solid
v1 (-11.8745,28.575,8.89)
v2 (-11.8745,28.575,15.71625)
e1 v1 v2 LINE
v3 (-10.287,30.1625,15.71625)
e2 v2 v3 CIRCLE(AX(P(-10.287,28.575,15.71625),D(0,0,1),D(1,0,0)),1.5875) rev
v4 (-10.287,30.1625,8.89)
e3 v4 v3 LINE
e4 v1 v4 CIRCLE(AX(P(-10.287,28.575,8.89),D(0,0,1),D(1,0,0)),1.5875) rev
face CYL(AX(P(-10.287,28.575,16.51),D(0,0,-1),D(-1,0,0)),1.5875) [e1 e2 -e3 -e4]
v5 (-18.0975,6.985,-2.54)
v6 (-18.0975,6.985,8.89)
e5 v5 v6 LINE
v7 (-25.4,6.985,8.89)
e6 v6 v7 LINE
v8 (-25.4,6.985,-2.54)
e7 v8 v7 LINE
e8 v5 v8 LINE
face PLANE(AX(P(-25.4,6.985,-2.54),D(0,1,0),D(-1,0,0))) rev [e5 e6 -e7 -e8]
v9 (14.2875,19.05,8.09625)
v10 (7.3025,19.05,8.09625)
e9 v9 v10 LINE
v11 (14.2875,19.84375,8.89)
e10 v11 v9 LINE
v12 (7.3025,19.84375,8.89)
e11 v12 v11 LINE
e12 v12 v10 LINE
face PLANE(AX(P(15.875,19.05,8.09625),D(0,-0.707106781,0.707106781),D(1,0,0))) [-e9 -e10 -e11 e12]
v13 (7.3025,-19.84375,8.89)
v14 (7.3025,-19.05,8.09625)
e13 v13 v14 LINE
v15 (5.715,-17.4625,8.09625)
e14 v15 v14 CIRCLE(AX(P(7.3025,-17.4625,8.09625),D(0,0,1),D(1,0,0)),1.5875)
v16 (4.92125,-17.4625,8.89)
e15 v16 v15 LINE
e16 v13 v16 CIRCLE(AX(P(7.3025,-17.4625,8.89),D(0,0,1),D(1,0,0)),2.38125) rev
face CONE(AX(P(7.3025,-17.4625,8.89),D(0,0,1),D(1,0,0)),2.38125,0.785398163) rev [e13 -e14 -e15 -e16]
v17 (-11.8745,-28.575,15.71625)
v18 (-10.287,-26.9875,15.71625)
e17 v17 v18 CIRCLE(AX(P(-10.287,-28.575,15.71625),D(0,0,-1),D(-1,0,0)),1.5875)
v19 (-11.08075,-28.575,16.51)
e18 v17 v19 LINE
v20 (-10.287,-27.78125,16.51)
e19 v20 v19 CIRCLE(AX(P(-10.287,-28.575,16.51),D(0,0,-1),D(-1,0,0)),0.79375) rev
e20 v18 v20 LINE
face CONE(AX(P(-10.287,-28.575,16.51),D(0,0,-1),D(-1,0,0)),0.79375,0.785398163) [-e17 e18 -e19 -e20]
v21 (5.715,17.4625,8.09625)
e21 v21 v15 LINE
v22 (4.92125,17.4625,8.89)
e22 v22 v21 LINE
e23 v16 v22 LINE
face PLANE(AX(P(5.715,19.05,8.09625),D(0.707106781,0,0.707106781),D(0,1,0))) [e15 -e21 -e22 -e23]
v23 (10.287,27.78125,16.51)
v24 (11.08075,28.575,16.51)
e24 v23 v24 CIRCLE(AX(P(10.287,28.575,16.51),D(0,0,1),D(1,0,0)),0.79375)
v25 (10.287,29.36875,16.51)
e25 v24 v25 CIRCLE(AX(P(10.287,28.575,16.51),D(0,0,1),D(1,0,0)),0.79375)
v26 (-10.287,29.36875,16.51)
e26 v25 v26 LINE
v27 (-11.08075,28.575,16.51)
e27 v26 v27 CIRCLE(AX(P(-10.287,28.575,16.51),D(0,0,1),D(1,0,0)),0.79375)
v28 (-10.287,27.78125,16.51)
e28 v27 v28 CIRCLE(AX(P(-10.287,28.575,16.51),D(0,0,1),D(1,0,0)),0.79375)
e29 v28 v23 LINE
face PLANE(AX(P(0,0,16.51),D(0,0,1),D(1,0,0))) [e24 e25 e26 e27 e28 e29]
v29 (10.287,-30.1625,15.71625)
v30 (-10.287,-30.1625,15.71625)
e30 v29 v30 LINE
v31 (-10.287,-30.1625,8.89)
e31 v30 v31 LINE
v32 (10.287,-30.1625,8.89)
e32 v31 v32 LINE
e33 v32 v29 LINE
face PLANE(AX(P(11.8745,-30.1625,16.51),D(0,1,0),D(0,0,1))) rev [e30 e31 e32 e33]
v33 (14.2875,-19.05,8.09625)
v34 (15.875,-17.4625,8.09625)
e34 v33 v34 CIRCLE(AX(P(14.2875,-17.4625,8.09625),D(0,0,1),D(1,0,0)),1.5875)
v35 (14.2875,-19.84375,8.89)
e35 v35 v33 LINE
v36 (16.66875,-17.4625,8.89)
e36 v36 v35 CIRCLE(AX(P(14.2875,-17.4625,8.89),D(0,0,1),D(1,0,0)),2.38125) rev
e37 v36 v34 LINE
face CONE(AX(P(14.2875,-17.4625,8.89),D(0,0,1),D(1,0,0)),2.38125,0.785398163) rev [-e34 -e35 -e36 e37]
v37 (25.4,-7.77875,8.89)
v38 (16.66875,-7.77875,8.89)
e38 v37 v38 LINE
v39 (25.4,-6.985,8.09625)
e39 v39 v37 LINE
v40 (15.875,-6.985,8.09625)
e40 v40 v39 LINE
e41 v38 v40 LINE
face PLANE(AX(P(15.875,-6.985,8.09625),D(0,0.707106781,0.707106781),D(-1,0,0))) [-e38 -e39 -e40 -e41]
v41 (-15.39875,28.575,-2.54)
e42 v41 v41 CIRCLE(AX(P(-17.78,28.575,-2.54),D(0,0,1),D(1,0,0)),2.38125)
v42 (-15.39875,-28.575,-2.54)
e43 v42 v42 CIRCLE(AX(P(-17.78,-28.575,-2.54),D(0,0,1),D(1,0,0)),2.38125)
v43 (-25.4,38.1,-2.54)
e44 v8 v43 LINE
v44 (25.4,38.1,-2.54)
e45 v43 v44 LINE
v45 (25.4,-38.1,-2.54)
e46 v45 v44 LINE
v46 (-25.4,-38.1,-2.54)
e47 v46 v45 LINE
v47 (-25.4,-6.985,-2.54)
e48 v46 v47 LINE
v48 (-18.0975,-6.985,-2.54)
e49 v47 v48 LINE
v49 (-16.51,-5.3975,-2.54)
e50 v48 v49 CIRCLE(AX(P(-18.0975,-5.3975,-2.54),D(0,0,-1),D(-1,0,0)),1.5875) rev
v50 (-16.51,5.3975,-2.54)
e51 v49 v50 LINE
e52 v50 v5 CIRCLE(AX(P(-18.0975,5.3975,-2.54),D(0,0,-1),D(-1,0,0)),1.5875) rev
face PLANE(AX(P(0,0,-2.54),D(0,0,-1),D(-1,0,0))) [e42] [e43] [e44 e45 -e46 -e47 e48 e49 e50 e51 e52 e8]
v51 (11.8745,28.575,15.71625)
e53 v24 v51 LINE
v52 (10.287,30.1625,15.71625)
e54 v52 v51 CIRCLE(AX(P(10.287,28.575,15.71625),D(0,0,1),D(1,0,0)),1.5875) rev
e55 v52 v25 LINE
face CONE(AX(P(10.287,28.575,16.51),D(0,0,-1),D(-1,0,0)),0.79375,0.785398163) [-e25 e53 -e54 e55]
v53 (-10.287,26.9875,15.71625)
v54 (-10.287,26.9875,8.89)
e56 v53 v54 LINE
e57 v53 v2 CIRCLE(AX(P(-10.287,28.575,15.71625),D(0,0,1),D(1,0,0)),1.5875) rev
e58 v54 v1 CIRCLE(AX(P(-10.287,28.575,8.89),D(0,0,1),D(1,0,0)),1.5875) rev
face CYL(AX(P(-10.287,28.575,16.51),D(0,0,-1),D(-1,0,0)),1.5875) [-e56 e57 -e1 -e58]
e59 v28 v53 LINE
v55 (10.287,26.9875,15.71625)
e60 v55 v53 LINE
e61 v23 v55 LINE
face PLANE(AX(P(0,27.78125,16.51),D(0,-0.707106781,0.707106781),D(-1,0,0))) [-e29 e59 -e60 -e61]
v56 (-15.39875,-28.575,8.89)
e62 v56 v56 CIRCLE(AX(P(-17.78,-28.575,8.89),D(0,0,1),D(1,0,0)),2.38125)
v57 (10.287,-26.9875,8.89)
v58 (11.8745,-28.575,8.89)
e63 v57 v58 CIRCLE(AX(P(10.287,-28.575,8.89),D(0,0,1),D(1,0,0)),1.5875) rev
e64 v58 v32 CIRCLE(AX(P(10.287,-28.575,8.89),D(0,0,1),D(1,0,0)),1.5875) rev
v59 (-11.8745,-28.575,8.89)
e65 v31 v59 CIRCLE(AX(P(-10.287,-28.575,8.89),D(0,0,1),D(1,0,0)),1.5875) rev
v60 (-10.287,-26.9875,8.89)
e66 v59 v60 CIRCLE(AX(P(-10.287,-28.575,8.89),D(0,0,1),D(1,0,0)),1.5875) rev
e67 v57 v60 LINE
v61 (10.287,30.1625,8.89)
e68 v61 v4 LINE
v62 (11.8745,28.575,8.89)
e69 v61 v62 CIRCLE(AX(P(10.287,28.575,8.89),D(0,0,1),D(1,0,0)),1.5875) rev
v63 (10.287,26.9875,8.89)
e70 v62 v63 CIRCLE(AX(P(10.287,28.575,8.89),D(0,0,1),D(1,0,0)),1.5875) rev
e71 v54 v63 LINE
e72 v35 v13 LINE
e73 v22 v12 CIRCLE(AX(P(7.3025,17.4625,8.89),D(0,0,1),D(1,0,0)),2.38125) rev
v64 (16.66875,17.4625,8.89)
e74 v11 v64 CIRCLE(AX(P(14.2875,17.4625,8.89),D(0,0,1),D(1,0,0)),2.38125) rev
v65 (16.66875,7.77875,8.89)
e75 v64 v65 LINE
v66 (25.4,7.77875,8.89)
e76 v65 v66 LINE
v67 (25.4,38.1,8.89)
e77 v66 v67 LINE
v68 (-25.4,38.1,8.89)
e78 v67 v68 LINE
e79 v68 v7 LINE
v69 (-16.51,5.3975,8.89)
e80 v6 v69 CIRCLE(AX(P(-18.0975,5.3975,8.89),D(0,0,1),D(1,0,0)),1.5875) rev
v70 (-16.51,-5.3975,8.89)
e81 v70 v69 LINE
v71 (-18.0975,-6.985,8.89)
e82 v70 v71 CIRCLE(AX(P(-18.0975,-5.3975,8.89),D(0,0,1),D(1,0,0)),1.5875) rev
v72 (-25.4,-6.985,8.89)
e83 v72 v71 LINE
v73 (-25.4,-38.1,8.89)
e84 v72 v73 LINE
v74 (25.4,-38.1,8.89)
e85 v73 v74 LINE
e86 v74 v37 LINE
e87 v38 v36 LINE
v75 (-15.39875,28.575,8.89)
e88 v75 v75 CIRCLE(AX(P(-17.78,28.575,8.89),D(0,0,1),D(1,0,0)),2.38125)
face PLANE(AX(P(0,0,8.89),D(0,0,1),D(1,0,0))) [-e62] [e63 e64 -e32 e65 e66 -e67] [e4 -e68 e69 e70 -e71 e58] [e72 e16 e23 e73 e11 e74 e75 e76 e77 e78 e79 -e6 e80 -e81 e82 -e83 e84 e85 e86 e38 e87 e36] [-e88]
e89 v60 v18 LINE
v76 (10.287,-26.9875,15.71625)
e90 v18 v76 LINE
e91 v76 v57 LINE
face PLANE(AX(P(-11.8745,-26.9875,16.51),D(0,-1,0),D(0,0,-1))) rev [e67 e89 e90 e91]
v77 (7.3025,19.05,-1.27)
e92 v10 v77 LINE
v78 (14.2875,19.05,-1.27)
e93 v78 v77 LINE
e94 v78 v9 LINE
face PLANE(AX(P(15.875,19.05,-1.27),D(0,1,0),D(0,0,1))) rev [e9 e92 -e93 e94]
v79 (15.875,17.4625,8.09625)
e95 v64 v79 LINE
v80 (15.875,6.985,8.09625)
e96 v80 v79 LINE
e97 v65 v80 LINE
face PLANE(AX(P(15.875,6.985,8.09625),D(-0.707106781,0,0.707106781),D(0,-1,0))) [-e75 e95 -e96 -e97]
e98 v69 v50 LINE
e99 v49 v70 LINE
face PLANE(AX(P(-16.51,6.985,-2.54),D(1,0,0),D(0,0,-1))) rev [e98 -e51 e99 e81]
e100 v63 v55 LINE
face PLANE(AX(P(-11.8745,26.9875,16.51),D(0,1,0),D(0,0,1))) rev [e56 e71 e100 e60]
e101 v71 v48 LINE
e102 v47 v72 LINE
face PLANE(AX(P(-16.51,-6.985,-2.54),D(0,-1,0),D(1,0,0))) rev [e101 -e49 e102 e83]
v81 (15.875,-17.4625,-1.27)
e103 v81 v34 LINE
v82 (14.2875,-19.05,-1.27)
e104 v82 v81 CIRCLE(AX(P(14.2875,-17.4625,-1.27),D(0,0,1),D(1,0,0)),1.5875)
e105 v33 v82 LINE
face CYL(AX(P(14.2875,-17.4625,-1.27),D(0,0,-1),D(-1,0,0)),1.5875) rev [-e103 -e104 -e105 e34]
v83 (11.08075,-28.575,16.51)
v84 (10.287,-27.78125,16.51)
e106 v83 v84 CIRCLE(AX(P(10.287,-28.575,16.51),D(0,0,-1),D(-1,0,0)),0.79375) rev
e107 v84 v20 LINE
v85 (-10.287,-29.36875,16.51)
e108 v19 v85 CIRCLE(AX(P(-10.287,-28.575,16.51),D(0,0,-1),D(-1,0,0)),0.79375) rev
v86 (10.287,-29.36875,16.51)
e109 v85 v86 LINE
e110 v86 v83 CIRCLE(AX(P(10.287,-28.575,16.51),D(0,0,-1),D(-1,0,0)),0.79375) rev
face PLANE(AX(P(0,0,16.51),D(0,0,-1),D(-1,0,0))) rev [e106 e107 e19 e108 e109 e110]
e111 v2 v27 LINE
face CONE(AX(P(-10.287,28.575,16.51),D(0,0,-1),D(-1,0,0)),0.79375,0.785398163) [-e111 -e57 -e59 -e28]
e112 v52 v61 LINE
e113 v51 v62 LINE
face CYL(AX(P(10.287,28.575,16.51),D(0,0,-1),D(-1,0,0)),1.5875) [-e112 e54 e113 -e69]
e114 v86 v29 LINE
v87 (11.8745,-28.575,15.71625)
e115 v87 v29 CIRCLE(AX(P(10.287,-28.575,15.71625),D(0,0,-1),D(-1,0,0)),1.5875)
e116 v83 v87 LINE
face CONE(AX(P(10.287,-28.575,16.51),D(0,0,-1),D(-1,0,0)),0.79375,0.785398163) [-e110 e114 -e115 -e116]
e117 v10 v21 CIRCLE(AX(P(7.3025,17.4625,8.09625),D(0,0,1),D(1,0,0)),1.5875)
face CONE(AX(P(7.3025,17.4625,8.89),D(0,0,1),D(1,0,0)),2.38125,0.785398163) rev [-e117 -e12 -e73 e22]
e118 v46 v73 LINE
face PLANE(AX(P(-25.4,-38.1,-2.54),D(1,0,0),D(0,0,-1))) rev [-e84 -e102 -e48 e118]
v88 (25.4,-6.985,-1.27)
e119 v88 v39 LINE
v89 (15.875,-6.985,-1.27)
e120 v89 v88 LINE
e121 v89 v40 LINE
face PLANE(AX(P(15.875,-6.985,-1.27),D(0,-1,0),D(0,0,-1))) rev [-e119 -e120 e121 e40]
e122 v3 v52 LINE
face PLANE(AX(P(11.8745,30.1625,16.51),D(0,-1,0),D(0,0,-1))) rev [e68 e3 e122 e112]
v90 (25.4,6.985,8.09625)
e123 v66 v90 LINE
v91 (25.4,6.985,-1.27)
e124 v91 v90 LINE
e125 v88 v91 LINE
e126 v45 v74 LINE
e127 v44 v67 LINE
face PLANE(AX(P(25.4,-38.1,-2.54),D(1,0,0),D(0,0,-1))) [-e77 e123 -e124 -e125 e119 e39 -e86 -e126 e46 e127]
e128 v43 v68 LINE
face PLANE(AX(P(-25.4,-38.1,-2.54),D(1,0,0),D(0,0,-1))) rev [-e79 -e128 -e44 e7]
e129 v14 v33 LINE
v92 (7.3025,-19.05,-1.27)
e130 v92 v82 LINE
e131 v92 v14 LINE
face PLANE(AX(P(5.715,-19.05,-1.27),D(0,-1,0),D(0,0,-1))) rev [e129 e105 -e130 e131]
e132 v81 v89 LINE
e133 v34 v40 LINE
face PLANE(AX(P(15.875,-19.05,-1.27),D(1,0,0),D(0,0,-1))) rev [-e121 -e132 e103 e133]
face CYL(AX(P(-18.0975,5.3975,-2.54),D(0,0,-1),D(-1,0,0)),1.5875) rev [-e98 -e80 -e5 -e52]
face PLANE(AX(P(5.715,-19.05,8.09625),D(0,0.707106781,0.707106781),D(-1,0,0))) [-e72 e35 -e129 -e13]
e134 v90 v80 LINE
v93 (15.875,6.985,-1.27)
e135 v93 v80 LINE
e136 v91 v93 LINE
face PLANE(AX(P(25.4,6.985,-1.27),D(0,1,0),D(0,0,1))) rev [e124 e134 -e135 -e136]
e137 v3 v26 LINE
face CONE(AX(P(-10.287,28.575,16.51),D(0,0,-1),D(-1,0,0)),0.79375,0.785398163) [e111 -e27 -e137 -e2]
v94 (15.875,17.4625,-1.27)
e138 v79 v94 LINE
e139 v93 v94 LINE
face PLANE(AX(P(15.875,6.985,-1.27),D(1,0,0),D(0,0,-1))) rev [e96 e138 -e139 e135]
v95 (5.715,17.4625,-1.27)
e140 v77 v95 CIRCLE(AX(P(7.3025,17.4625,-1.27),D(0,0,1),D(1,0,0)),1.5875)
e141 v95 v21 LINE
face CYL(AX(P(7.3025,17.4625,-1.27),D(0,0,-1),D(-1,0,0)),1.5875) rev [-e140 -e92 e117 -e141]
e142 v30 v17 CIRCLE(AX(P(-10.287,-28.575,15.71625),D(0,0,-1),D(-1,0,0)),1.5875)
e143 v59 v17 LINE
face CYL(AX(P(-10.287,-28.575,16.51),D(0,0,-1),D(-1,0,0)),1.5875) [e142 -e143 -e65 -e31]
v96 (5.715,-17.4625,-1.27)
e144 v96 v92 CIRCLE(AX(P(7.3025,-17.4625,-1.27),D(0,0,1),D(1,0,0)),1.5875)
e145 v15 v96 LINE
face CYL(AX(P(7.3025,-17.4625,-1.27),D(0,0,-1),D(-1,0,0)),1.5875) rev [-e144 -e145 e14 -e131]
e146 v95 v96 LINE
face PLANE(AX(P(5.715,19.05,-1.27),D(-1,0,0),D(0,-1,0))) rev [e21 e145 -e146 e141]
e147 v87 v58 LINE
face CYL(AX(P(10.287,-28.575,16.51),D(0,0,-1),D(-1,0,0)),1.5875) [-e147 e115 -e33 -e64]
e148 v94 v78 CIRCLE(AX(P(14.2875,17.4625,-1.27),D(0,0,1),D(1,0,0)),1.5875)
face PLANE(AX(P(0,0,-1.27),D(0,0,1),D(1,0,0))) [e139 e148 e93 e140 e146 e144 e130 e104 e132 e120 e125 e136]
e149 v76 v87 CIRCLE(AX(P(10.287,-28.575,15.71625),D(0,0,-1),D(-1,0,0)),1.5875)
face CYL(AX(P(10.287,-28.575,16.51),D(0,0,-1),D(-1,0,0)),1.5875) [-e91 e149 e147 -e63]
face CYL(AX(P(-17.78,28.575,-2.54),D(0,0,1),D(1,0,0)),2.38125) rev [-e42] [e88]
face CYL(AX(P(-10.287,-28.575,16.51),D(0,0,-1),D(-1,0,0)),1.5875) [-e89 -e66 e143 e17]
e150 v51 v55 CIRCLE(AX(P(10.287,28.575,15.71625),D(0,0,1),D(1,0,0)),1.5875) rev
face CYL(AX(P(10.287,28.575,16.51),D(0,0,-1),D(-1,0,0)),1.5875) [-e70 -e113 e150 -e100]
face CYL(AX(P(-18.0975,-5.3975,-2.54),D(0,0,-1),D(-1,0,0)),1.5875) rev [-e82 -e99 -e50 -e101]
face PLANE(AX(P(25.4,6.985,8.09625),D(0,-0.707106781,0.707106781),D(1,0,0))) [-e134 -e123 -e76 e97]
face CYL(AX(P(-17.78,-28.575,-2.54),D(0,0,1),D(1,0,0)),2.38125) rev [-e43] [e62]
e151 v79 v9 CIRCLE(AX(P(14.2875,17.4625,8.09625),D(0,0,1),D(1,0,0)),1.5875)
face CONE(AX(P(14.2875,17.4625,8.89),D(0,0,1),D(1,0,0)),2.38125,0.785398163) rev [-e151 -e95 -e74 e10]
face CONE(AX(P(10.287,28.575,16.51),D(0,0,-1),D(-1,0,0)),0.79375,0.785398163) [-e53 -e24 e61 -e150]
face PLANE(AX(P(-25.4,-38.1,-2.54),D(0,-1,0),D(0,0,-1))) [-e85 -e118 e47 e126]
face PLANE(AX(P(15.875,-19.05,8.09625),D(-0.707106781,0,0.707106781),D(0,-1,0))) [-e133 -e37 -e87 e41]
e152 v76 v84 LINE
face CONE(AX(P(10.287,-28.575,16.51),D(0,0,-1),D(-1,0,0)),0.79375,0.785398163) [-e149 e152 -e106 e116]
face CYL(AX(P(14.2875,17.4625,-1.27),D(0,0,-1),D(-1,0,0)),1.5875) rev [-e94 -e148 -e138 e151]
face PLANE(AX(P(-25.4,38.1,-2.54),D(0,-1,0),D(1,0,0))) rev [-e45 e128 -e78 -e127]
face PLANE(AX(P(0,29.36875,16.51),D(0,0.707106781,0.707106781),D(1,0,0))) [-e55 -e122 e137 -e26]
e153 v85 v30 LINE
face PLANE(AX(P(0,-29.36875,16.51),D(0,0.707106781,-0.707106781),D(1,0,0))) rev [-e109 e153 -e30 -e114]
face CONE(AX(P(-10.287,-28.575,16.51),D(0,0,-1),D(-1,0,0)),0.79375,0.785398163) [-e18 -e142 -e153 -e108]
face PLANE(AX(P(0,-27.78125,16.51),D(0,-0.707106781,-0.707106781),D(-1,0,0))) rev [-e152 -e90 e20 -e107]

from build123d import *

# Parameters (mm, degrees)
SKETCH1_W           = 76.2
SKETCH1_H           = 50.8
BOSS_EXTRUDE1_DEPTH = 2.54
SKETCH2_W           = 50.8
SKETCH2_H           = 76.2
BOSS_EXTRUDE2_DEPTH = 8.89
CUT_EXTRUDE1_DEPTH  = 10.16
SKETCH4_W           = 8.89
SKETCH4_H           = 13.97
CUT_EXTRUDE2_DEPTH  = 48.195496607
SKETCH5_R           = 2.38125
CUT_EXTRUDE3_DEPTH  = 48.195496607
SKETCH9_W           = 23.749
SKETCH9_H           = 3.175
BOSS_EXTRUDE4_DEPTH = 7.62
FILLET1_R           = 1.5875
CHAMFER2_SIZE       = 0.79375


with BuildPart() as part:
    # Sketch1 → Boss-Extrude1 (new body)
    with BuildSketch(Plane(origin=(0, 0, 0), x_dir=(0, 1, 0), z_dir=(0, 0, 1))):
        Rectangle(SKETCH1_W, SKETCH1_H)
    extrude(amount=-BOSS_EXTRUDE1_DEPTH)

    # Sketch2 → Boss-Extrude2 (add)
    with BuildSketch(Plane.XY):
        Rectangle(SKETCH2_W, SKETCH2_H)
    extrude(amount=BOSS_EXTRUDE2_DEPTH)

    # Sketch3 → Cut-Extrude1 (cut)
    with BuildSketch(Plane.XY.offset(8.89)):
        Polygon((5.715, 19.05), (5.715, -19.05), (15.875, -19.05), (15.875, -6.985), (25.4, -6.985), (25.4, 6.985), (15.875, 6.985), (15.875, 19.05), align=None)
    extrude(amount=-CUT_EXTRUDE1_DEPTH, mode=Mode.SUBTRACT)

    # Sketch4 → Cut-Extrude2 (cut, through all)
    with BuildSketch(Plane.XY.offset(8.89)):
        with Locations((-20.955, 0)):
            Rectangle(SKETCH4_W, SKETCH4_H)
    extrude(amount=-CUT_EXTRUDE2_DEPTH, mode=Mode.SUBTRACT)

    # Sketch5 → Cut-Extrude3 (cut, through all)
    with BuildSketch(Plane.XY.offset(8.89)):
        with Locations((-17.78, -28.575)):
            Circle(SKETCH5_R)
        with Locations((-17.78, 28.575)):
            Circle(SKETCH5_R)
    extrude(amount=-CUT_EXTRUDE3_DEPTH, mode=Mode.SUBTRACT)

    # Sketch9 → Boss-Extrude4 (add)
    with BuildSketch(Plane.XY.offset(8.89)):
        with Locations((0, 28.575)):
            Rectangle(SKETCH9_W, SKETCH9_H)
        with Locations((0, -28.575)):
            Rectangle(SKETCH9_W, SKETCH9_H)
    extrude(amount=BOSS_EXTRUDE4_DEPTH)

    # Fillet1
    fillet1_edges = [part.edges().sort_by_distance(p)[0] for p in [
        (5.715, 19.05, 3.81),
        (15.875, 19.05, 3.81),
        (5.715, -19.05, 3.81),
        (15.875, -19.05, 3.81),
        (-16.51, 6.985, 3.175),
        (-16.51, -6.985, 3.175),
        (-11.8745, 30.1625, 12.7),
        (-11.8745, 26.9875, 12.7),
        (11.8745, 30.1625, 12.7),
        (11.8745, 26.9875, 12.7),
        (-11.8745, -26.9875, 12.7),
        (-11.8745, -30.1625, 12.7),
        (11.8745, -26.9875, 12.7),
        (11.8745, -30.1625, 12.7),
    ]]
    fillet(fillet1_edges, radius=FILLET1_R - 0.0001)  # a hair under: the kernel refuses the full size

    # Chamfer2
    chamfer2_edges = [part.edges().sort_by_distance(p)[0] for p in [
        (0, -26.9875, 16.51),
        (0, -30.1625, 16.51),
        (11.409561304, -29.697561304, 16.51),
        (11.409561304, -27.452438696, 16.51),
        (-11.409561304, -29.697561304, 16.51),
        (-11.409561304, -27.452438696, 16.51),
        (0, 30.1625, 16.51),
        (0, 26.9875, 16.51),
        (11.409561304, 27.452438696, 16.51),
        (11.409561304, 29.697561304, 16.51),
        (-11.409561304, 27.452438696, 16.51),
        (-11.409561304, 29.697561304, 16.51),
        (5.715, 0, 8.89),
        (10.795, 19.05, 8.89),
        (10.795, -19.05, 8.89),
        (15.875, -12.2238, 8.89),
        (6.179938696, 18.585061304, 8.89),
        (15.410061304, 18.585061304, 8.89),
        (6.179938696, -18.585061304, 8.89),
        (15.410061304, -18.585061304, 8.89),
        (20.6375, -6.985, 8.89),
        (20.6375, 6.985, 8.89),
        (15.875, 12.2238, 8.89),
    ]]
    chamfer(chamfer2_edges, length=CHAMFER2_SIZE)


solid = part.part
